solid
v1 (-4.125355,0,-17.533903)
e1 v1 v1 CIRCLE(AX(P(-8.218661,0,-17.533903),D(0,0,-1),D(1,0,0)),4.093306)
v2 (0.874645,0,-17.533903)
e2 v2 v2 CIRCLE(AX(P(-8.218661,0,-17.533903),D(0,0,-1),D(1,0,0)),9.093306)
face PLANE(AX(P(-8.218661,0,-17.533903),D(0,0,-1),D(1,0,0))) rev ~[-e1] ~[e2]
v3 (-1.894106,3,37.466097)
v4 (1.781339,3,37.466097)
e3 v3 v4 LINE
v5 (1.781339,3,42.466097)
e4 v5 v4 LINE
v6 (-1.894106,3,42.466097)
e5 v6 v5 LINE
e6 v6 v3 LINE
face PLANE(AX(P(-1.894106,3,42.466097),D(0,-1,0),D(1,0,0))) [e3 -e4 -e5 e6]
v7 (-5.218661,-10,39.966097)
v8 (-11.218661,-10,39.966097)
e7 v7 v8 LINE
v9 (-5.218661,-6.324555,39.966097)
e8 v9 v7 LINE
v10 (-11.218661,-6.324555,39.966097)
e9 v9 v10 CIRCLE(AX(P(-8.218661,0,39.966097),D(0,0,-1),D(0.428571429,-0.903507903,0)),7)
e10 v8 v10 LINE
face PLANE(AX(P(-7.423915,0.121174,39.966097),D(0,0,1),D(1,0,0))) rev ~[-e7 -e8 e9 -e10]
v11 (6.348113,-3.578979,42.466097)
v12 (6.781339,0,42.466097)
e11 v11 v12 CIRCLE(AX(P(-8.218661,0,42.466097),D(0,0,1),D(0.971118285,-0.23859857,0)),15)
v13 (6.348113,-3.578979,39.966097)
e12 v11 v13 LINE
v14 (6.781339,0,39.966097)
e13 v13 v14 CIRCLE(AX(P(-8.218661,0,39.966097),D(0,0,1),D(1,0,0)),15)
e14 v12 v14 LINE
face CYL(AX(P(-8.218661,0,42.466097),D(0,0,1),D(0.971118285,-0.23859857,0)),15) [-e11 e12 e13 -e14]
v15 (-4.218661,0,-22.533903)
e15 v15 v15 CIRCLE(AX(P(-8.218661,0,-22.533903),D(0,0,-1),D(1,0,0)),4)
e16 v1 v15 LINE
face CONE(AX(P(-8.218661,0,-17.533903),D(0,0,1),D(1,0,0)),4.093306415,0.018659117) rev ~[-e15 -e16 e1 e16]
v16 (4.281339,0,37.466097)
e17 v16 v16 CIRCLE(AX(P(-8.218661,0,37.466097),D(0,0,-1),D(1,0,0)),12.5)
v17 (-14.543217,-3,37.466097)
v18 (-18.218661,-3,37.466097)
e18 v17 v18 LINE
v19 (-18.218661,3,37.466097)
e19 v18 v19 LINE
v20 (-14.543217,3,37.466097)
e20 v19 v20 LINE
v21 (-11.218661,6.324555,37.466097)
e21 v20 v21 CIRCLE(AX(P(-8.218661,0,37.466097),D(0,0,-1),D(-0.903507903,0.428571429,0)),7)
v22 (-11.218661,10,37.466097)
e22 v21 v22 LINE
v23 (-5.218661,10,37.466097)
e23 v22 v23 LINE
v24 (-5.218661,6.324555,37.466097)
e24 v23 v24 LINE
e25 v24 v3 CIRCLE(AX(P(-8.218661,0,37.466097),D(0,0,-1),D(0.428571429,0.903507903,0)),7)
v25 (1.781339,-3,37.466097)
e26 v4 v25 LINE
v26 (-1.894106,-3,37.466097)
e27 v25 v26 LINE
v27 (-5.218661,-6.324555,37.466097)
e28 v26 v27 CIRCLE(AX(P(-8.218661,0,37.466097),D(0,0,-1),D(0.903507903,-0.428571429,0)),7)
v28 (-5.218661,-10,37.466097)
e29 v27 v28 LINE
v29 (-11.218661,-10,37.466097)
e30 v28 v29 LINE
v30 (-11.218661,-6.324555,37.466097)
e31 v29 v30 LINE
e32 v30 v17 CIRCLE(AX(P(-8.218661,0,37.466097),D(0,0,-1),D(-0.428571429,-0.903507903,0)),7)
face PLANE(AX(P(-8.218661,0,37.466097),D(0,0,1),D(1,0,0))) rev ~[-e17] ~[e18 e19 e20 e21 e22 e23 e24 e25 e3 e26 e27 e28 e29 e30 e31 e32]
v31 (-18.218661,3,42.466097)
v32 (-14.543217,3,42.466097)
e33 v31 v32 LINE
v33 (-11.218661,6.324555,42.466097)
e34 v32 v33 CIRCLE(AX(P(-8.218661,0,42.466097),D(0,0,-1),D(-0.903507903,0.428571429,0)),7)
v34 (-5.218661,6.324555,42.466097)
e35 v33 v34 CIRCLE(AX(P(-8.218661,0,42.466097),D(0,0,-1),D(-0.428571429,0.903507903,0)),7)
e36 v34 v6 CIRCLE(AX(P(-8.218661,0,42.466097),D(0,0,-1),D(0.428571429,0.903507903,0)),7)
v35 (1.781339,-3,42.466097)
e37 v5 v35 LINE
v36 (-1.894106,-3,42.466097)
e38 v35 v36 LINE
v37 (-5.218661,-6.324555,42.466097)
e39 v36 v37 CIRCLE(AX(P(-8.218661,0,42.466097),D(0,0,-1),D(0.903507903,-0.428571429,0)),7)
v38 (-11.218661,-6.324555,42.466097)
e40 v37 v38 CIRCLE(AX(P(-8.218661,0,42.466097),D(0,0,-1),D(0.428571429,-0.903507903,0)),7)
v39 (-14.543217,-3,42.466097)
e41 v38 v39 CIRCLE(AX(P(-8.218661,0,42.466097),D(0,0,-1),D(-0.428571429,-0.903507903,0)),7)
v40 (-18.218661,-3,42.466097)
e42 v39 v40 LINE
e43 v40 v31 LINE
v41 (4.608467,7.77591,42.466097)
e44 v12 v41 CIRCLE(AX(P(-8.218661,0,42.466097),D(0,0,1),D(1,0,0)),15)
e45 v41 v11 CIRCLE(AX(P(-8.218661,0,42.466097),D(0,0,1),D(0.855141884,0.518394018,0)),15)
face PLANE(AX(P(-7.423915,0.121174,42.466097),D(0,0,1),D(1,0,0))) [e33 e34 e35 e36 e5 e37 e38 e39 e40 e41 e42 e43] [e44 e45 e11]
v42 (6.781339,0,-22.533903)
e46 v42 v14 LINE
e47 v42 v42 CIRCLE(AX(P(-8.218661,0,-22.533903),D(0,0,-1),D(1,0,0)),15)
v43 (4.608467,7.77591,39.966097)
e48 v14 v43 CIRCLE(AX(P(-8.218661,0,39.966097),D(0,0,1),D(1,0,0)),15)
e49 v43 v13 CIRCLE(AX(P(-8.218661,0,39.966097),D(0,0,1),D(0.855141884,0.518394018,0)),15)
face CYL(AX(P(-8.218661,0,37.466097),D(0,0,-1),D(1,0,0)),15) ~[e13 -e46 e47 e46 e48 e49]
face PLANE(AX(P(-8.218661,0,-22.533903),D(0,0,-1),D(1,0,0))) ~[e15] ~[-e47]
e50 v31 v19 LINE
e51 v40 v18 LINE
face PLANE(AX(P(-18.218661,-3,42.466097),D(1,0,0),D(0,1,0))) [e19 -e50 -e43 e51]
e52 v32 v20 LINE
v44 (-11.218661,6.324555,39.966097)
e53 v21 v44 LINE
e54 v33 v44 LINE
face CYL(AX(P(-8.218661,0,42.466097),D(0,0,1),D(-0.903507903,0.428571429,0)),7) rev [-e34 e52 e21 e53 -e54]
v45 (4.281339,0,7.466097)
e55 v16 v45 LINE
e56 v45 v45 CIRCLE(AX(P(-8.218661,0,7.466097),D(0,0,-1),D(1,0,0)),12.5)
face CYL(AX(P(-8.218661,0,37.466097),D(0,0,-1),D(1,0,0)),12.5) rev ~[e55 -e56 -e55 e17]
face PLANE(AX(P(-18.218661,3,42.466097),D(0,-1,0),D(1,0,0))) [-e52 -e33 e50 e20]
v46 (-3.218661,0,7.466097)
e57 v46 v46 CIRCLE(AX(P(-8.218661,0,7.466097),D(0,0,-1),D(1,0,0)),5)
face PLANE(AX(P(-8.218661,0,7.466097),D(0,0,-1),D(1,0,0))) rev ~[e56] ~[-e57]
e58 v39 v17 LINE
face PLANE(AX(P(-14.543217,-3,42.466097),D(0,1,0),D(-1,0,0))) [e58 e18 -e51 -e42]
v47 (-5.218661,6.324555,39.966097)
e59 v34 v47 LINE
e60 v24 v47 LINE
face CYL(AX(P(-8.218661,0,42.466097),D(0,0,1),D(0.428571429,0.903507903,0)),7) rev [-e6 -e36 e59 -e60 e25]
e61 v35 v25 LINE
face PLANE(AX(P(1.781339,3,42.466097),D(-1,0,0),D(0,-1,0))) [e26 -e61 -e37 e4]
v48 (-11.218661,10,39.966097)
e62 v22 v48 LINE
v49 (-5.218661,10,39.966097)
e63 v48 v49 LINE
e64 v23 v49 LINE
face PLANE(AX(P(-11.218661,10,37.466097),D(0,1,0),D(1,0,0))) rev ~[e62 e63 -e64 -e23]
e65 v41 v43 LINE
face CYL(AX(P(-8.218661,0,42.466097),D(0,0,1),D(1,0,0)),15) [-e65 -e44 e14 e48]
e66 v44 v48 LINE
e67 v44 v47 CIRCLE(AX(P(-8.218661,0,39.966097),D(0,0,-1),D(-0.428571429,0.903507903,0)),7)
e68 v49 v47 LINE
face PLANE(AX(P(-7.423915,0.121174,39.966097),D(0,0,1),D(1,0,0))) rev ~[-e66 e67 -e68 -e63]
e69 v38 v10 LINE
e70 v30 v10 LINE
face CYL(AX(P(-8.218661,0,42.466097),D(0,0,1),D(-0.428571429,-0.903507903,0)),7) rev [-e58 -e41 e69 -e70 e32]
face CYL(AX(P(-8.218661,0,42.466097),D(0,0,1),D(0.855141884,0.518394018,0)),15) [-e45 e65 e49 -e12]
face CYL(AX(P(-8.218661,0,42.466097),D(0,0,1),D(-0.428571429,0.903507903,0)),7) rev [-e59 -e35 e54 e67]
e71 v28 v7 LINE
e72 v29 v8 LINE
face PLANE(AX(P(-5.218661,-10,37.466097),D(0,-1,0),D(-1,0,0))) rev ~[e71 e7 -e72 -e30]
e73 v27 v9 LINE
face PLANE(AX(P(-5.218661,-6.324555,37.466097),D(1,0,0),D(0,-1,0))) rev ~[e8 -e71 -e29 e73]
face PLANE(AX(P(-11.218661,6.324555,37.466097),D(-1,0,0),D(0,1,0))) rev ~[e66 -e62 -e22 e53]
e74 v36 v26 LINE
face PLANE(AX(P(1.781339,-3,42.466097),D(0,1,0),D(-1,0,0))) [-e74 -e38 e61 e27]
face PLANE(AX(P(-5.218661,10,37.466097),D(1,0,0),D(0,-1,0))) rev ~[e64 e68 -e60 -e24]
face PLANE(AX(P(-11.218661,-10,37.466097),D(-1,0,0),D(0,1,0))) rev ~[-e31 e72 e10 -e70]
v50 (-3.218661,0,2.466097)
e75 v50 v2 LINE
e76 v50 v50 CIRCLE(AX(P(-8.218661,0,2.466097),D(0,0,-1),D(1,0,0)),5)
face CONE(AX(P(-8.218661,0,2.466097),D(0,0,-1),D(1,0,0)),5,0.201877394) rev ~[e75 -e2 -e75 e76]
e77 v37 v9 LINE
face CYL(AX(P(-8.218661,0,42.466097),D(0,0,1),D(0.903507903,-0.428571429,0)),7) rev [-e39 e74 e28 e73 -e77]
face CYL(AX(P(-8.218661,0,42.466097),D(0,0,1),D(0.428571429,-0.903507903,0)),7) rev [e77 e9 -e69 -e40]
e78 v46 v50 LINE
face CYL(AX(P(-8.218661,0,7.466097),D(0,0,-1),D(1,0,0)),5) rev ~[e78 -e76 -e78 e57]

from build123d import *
from build123d import SkipClean  # not in build123d's __all__

# Parameters (mm, degrees)
F1_DEPTH  = 2.5
F3_DEPTH  = 2.5
F6_ANGLE  = 90
F8_R      = 12.5
F9_DEPTH  = 2.5
F10_DEPTH = 2.5
F13_DEPTH = 2.5


with BuildPart() as f1:
    # F0 (on Front) → F1 (new body)
    with BuildSketch(Plane.XZ):
        with BuildLine():
            ThreePointArc((-66.598045975, 33.1235192716), (-51.598045975, 18.1235192716), (-36.598045975, 33.1235192716))
            ThreePointArc((-36.598045975, 33.1235192716), (-51.598045975, 48.1235192716), (-66.598045975, 33.1235192716))
        make_face()
        with BuildLine():
            ThreePointArc((-48.598045975, 39.4480745919), (-46.6482985067, 38.0732667399), (-45.2734906546, 36.1235192716))
            Line((-45.2734906546, 36.1235192716), (-41.598045975, 36.1235192716))
            Line((-41.598045975, 36.1235192716), (-41.598045975, 30.1235192716))
            Line((-41.598045975, 30.1235192716), (-45.2734906546, 30.1235192716))
            ThreePointArc((-45.2734906546, 30.1235192716), (-46.6482985067, 28.1737718033), (-48.598045975, 26.7989639513))
            Line((-48.598045975, 26.7989639513), (-48.598045975, 23.1235192716))
            Line((-48.598045975, 23.1235192716), (-54.598045975, 23.1235192716))
            Line((-54.598045975, 23.1235192716), (-54.598045975, 26.7989639513))
            ThreePointArc((-54.598045975, 26.7989639513), (-56.5477934433, 28.1737718033), (-57.9226012953, 30.1235192716))
            Line((-57.9226012953, 30.1235192716), (-61.598045975, 30.1235192716))
            Line((-61.598045975, 30.1235192716), (-61.598045975, 36.1235192716))
            Line((-61.598045975, 36.1235192716), (-57.9226012953, 36.1235192716))
            ThreePointArc((-57.9226012953, 36.1235192716), (-56.5477934433, 38.0732667399), (-54.598045975, 39.4480745919))
            Line((-54.598045975, 39.4480745919), (-54.598045975, 43.1235192716))
            Line((-54.598045975, 43.1235192716), (-48.598045975, 43.1235192716))
            Line((-48.598045975, 43.1235192716), (-48.598045975, 39.4480745919))
        make_face(mode=Mode.SUBTRACT)
    extrude(amount=F1_DEPTH)

    # F2 (on face) → F3 (join)
    with BuildSketch(Plane(origin=(0, 0, 0), x_dir=(-1, 0, 0), z_dir=(0, 1, 0))):
        with BuildLine():
            ThreePointArc((66.598045975, 33.1235192716), (66.0446186482, 37.1604163471), (64.4251742419, 40.899429535))
            ThreePointArc((64.4251742419, 40.899429535), (36.7710486733, 30.8519226932), (66.164820243, 29.5445407268))
            ThreePointArc((66.164820243, 29.5445407268), (66.4893456835, 31.3209674721), (66.598045975, 33.1235192716))
        make_face()
        with BuildLine():
            ThreePointArc((54.598045975, 39.4480745919), (56.5477934433, 38.0732667399), (57.9226012953, 36.1235192716))
            Line((57.9226012953, 36.1235192716), (61.598045975, 36.1235192716))
            Line((61.598045975, 36.1235192716), (61.598045975, 30.1235192716))
            Line((61.598045975, 30.1235192716), (57.9226012953, 30.1235192716))
            ThreePointArc((57.9226012953, 30.1235192716), (56.5477934433, 28.1737718033), (54.598045975, 26.7989639513))
            ThreePointArc((54.598045975, 26.7989639513), (51.598045975, 26.1235192716), (48.598045975, 26.7989639513))
            ThreePointArc((48.598045975, 26.7989639513), (46.6482985067, 28.1737718033), (45.2734906546, 30.1235192716))
            Line((45.2734906546, 30.1235192716), (41.598045975, 30.1235192716))
            Line((41.598045975, 30.1235192716), (41.598045975, 36.1235192716))
            Line((41.598045975, 36.1235192716), (45.2734906546, 36.1235192716))
            ThreePointArc((45.2734906546, 36.1235192716), (46.6482985067, 38.0732667399), (48.598045975, 39.4480745919))
            ThreePointArc((48.598045975, 39.4480745919), (51.598045975, 40.1235192716), (54.598045975, 39.4480745919))
        make_face(mode=Mode.SUBTRACT)
    with SkipClean():  # cleaning this boolean's faces spoils the solid; the shape is the same uncleaned
        extrude(amount=F3_DEPTH)


with BuildPart() as f5:
    # F4 (on Front) → F5 (revolve)
    with BuildSketch(Plane.XZ):
        Polygon((6.781338717, -22.533902707), (6.781338717, 37.466097293), (4.281338717, 37.466097293), (4.281338717, 7.466097293), (-3.218661283, 7.466097293), (-3.218661283, 2.466097293), (0.8746451318, -17.533902707), (-4.1253548682, -17.533902707), (-4.218661283, -22.533902707), align=None)
    revolve(axis=Axis((-8.218661283, 0, -12.1948756373), (0, 0, -1)))

    # F8 (on offset) → F9 (join)
    with BuildSketch(Plane.XY.offset(37.466097293)):
        with BuildLine():
            ThreePointArc((-23.218661283, 0), (-8.218661283, -15), (6.781338717, 0))
            ThreePointArc((6.781338717, 0), (-8.218661283, 15), (-23.218661283, 0))
        make_face()
        with Locations((-8.218661283, 0)):
            Circle(F8_R, mode=Mode.SUBTRACT)
    extrude(amount=F9_DEPTH)

    # F8 (on offset) → F10 (join)
    with BuildSketch(Plane.XY.offset(37.466097293)):
        with Locations((-8.218661283, 0)):
            Circle(F8_R)
        with BuildLine():
            ThreePointArc((-5.218661283, 6.3245553203), (-3.2689138147, 4.9497474683), (-1.8941059626, 3))
            Line((-1.8941059626, 3), (1.781338717, 3))
            Line((1.781338717, 3), (1.781338717, -3))
            Line((1.781338717, -3), (-1.8941059626, -3))
            ThreePointArc((-1.8941059626, -3), (-3.2689138147, -4.9497474683), (-5.218661283, -6.3245553203))
            Line((-5.218661283, -6.3245553203), (-5.218661283, -10))
            Line((-5.218661283, -10), (-11.218661283, -10))
            Line((-11.218661283, -10), (-11.218661283, -6.3245553203))
            ThreePointArc((-11.218661283, -6.3245553203), (-13.1684087513, -4.9497474683), (-14.5432166033, -3))
            Line((-14.5432166033, -3), (-18.218661283, -3))
            Line((-18.218661283, -3), (-18.218661283, 3))
            Line((-18.218661283, 3), (-14.5432166033, 3))
            ThreePointArc((-14.5432166033, 3), (-13.1684087513, 4.9497474683), (-11.218661283, 6.3245553203))
            Line((-11.218661283, 6.3245553203), (-11.218661283, 10))
            Line((-11.218661283, 10), (-5.218661283, 10))
            Line((-5.218661283, 10), (-5.218661283, 6.3245553203))
        make_face(mode=Mode.SUBTRACT)
    extrude(amount=F10_DEPTH)

    # F12 (on offset) → F13 (join)
    with BuildSketch(Plane.XY.offset(42.466097293)):
        with BuildLine():
            ThreePointArc((6.781338717, 0), (6.2279113902, 4.0368970755), (4.6084669839, 7.7759102634))
            ThreePointArc((4.6084669839, 7.7759102634), (-23.0456585847, -2.2715965784), (6.3481129851, -3.5789785448))
            ThreePointArc((6.3481129851, -3.5789785448), (6.6726384256, -1.8025517995), (6.781338717, 0))
        make_face()
        with BuildLine():
            ThreePointArc((-5.218661283, 6.3245553203), (-3.2689138147, 4.9497474683), (-1.8941059626, 3))
            Line((-1.8941059626, 3), (1.781338717, 3))
            Line((1.781338717, 3), (1.781338717, -3))
            Line((1.781338717, -3), (-1.8941059626, -3))
            ThreePointArc((-1.8941059626, -3), (-3.2689138147, -4.9497474683), (-5.218661283, -6.3245553203))
            ThreePointArc((-5.218661283, -6.3245553203), (-8.218661283, -7), (-11.218661283, -6.3245553203))
            ThreePointArc((-11.218661283, -6.3245553203), (-13.1684087513, -4.9497474683), (-14.5432166033, -3))
            Line((-14.5432166033, -3), (-18.218661283, -3))
            Line((-18.218661283, -3), (-18.218661283, 3))
            Line((-18.218661283, 3), (-14.5432166033, 3))
            ThreePointArc((-14.5432166033, 3), (-13.1684087513, 4.9497474683), (-11.218661283, 6.3245553203))
            ThreePointArc((-11.218661283, 6.3245553203), (-8.218661283, 7), (-5.218661283, 6.3245553203))
        make_face(mode=Mode.SUBTRACT)
    extrude(amount=-F13_DEPTH)


with BuildPart() as f1_1:
    # F6: moved
    add(f1.part.rotate(Axis((-43.4357683148, 2.5, 36.1235192716), (-1, 0, 0)), F6_ANGLE), clean=False)


solid = f5.part
